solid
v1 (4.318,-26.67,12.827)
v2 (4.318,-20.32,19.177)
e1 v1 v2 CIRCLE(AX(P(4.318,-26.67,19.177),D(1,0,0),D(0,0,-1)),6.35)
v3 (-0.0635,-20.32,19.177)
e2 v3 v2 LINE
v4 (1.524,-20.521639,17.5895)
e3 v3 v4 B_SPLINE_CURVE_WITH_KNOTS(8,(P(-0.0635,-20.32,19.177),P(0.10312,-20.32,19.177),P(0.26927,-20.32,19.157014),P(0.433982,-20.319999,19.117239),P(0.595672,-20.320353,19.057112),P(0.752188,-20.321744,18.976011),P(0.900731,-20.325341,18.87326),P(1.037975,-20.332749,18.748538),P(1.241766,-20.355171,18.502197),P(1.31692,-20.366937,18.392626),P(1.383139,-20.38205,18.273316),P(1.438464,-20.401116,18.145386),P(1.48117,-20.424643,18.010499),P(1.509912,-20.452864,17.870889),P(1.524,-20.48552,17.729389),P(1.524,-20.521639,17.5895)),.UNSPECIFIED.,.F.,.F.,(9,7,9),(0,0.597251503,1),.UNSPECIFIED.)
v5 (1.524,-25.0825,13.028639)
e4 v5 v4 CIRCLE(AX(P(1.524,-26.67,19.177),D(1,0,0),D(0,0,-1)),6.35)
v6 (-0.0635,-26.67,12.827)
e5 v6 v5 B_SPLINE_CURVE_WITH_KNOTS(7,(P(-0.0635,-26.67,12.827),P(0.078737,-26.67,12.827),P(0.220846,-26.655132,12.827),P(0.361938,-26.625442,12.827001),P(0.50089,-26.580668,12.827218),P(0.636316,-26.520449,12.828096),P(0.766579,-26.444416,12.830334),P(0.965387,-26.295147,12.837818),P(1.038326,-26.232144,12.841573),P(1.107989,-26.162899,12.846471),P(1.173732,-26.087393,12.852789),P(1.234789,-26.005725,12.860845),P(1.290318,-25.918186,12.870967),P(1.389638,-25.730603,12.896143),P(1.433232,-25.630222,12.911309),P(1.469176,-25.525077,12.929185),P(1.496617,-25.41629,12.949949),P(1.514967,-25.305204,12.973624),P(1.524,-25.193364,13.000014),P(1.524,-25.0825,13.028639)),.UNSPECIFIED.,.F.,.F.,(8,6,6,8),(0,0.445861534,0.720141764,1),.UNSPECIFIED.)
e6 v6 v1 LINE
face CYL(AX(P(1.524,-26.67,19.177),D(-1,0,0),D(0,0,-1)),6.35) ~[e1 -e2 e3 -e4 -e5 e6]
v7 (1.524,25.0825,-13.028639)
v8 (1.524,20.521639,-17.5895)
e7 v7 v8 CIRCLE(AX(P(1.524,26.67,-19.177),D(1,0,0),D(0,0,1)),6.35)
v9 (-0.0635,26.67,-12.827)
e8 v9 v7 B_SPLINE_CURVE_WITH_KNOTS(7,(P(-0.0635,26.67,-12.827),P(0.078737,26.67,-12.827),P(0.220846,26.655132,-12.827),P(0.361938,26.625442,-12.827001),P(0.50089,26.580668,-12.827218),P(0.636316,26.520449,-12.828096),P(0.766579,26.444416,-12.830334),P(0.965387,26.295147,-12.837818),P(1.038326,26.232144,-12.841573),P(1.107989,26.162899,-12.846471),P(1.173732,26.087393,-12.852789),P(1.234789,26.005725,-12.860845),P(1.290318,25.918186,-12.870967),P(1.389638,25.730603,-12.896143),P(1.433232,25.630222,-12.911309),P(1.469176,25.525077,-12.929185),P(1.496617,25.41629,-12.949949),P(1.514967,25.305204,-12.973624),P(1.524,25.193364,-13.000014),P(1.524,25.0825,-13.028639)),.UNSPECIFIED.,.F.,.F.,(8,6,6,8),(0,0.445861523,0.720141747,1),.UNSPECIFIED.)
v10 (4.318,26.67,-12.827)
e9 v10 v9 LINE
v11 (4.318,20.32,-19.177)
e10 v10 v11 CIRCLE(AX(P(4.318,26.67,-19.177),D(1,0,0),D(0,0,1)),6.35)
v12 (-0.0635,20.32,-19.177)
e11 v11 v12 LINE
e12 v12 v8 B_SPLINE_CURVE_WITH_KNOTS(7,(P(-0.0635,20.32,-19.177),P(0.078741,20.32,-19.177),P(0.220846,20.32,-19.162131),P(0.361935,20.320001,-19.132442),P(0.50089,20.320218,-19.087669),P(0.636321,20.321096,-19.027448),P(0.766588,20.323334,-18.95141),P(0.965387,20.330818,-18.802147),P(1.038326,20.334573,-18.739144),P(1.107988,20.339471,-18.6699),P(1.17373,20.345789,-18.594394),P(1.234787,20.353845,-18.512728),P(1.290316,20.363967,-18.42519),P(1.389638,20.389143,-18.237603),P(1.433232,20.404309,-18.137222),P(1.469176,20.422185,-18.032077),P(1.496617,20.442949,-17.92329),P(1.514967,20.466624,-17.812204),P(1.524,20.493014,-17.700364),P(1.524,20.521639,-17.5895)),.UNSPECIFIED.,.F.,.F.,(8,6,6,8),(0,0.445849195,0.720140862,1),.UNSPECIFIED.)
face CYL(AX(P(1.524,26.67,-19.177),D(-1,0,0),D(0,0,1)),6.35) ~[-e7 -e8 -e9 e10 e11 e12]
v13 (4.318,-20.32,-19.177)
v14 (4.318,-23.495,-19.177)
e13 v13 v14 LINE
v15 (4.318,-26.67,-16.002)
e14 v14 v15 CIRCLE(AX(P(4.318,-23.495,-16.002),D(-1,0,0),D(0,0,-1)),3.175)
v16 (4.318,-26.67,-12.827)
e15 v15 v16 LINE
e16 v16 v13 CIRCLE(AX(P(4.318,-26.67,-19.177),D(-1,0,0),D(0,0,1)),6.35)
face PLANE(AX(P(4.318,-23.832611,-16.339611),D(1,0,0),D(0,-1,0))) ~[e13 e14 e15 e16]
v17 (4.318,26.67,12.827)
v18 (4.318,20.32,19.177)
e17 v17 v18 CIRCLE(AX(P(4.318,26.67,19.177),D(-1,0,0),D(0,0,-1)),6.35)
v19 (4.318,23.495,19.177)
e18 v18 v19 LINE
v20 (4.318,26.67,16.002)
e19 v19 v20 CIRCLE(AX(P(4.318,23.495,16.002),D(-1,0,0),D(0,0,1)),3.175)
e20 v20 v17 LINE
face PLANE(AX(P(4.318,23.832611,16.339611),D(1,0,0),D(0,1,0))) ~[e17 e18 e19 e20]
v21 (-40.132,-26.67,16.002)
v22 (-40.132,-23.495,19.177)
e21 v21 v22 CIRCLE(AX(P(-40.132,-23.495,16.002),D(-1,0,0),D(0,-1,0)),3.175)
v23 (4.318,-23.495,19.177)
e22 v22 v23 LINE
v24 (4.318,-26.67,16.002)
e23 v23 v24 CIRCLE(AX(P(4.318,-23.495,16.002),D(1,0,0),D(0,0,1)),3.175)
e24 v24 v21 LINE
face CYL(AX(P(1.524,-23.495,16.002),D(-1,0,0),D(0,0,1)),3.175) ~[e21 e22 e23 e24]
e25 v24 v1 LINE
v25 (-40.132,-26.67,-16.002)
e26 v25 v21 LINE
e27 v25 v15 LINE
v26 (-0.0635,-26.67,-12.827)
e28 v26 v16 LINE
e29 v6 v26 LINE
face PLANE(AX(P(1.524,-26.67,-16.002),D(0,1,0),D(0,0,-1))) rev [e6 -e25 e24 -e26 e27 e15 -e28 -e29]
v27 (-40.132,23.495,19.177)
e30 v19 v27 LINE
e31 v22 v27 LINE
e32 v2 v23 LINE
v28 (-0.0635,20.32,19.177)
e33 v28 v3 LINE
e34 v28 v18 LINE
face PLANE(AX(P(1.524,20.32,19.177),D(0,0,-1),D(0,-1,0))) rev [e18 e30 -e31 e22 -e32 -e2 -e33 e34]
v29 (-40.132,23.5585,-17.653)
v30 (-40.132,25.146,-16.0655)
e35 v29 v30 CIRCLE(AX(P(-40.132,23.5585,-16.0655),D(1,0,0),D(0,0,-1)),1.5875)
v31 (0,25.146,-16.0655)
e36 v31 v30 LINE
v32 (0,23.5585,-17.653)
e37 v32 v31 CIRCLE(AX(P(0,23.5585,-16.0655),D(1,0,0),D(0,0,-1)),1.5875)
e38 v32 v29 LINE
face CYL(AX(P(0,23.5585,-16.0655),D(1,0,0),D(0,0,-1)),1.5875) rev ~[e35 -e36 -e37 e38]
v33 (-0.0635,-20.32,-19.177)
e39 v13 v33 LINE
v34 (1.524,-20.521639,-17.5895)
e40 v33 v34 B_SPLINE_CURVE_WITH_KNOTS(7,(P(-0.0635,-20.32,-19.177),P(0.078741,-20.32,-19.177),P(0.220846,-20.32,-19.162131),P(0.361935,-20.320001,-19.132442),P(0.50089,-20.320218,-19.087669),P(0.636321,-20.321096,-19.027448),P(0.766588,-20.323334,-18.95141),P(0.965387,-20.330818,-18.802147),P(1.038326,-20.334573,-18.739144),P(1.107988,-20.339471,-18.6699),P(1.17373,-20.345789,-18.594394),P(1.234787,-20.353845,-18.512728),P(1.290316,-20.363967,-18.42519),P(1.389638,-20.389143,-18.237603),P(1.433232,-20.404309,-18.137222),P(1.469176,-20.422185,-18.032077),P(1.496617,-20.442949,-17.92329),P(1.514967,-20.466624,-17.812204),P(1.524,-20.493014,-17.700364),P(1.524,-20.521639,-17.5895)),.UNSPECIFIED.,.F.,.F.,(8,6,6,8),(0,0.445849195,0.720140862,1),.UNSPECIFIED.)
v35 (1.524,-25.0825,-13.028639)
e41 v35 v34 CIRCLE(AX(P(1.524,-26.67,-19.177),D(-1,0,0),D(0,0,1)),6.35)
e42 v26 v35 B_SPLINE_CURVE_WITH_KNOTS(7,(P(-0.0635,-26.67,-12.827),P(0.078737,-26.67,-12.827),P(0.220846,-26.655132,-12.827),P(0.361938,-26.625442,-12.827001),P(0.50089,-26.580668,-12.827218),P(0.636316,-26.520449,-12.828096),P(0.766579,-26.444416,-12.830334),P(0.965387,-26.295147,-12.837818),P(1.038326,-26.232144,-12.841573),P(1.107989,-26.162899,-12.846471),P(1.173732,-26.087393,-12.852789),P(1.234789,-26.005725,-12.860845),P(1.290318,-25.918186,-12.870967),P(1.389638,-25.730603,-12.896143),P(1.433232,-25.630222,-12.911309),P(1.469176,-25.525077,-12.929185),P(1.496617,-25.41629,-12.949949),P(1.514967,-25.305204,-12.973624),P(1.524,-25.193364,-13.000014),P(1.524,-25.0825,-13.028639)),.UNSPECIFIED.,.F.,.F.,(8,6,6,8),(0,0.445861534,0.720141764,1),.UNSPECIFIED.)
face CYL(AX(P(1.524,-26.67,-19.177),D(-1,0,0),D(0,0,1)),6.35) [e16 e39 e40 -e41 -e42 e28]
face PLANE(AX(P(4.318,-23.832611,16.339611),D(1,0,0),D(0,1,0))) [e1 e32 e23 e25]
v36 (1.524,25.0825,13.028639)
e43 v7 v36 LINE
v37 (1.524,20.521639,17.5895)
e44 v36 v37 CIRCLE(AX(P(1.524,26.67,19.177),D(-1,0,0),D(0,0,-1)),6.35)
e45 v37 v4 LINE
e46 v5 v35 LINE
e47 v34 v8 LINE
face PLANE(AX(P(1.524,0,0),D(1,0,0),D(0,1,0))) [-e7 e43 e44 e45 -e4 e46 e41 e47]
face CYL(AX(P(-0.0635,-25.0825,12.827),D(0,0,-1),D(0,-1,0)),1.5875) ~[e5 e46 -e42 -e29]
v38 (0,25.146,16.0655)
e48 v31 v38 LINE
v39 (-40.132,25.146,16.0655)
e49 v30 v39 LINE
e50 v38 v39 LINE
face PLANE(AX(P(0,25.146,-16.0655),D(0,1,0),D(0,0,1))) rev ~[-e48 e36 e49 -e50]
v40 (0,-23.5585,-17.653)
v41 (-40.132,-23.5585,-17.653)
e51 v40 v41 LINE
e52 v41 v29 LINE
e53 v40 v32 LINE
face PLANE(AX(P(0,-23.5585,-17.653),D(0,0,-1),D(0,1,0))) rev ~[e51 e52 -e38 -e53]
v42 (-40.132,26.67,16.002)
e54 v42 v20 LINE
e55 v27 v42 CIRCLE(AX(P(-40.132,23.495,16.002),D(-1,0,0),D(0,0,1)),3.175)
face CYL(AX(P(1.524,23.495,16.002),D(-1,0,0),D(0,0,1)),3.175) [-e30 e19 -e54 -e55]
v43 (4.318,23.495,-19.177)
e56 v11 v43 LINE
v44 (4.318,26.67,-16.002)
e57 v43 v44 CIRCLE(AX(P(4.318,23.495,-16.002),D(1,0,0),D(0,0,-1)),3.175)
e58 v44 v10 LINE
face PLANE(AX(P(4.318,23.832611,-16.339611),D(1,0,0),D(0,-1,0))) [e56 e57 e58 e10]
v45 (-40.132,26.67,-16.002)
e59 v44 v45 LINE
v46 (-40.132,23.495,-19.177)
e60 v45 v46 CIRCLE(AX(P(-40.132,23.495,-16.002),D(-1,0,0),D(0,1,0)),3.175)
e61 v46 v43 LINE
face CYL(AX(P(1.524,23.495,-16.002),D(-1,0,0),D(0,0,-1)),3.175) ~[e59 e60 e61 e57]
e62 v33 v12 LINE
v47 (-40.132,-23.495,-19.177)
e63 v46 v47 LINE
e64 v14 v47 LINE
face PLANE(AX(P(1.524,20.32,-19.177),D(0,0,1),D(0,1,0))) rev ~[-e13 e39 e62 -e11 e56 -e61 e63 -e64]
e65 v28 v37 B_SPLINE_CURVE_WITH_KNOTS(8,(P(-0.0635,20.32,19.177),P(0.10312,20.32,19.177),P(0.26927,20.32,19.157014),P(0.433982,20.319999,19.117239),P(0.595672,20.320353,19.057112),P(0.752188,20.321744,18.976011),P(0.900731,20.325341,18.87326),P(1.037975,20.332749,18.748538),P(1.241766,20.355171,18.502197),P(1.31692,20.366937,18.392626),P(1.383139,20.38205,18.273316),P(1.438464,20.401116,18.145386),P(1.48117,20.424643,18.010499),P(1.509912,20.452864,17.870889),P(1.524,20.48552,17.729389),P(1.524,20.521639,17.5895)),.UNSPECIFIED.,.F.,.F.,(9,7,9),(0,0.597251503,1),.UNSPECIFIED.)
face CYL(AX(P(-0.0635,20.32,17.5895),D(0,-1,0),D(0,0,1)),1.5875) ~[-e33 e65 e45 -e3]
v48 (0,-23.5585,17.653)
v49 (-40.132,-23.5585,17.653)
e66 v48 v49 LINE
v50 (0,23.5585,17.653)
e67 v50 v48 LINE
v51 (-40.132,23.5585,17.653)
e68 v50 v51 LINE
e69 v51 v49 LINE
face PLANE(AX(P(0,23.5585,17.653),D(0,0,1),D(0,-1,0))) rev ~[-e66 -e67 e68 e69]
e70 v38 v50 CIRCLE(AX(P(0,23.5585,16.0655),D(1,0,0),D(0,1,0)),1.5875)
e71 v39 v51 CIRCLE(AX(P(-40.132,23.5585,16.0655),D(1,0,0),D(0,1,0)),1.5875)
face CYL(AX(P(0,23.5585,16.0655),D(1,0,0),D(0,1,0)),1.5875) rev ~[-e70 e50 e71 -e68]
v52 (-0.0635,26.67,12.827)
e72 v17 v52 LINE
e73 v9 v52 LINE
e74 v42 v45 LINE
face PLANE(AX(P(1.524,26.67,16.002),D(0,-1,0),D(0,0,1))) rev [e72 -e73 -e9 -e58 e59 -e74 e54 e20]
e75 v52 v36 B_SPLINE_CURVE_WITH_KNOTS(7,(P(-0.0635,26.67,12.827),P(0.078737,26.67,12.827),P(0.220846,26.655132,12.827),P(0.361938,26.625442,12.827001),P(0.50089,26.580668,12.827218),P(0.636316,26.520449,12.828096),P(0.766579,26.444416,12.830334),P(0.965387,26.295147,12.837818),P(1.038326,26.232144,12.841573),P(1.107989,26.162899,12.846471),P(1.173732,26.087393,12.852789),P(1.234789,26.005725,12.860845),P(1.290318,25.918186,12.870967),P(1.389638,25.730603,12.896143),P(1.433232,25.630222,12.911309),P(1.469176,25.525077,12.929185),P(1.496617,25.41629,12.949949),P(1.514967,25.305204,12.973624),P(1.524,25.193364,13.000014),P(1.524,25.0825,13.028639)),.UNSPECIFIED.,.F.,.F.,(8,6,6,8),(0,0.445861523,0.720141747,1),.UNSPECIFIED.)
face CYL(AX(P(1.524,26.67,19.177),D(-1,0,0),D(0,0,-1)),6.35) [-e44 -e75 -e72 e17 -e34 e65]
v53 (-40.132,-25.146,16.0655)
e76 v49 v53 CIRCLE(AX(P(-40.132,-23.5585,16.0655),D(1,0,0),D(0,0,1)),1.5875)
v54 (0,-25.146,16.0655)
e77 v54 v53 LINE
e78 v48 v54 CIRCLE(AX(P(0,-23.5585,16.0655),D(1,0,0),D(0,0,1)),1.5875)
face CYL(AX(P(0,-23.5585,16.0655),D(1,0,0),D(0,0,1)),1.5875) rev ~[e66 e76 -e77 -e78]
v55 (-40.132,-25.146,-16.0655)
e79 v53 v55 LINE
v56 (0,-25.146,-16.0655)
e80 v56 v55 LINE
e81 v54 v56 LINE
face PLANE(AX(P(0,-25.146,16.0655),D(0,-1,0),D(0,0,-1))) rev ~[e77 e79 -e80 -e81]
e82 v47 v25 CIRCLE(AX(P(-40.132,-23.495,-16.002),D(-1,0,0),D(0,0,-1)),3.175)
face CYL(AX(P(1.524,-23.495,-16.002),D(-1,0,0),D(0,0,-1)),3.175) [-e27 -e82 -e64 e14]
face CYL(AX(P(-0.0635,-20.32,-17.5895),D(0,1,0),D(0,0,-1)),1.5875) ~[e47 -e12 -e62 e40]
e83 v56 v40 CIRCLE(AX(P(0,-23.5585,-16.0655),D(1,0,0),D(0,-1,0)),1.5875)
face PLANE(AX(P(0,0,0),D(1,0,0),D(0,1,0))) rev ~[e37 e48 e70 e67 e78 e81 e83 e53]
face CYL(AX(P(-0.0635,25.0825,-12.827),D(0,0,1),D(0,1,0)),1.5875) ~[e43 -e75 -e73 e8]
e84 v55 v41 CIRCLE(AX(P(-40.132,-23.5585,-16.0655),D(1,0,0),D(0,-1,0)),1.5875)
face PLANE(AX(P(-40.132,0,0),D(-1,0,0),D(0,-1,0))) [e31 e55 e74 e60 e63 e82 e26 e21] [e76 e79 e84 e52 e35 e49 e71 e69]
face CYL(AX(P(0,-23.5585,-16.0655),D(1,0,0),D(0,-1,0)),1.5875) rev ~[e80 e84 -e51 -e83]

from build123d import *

# Parameters (mm, degrees)
F1_DEPTH = 1.524
F3_DEPTH = 40.132
F5_DEPTH = 2.794
F8_R     = 1.5875
F9_R     = 1.5875
F10_R    = 1.5875
F11_R    = 1.5875


with BuildPart() as f1:
    # F0 (on Right) → F1 (new body)
    with BuildSketch(Plane.YZ):
        with BuildLine():
            ThreePointArc((26.67, 16.002), (25.7400640303, 18.2470640303), (23.495, 19.177))
            Line((23.495, 19.177), (-23.495, 19.177))
            ThreePointArc((-23.495, 19.177), (-25.7400640303, 18.2470640303), (-26.67, 16.002))
            Line((-26.67, 16.002), (-26.67, -16.002))
            ThreePointArc((-26.67, -16.002), (-25.7400640303, -18.2470640303), (-23.495, -19.177))
            Line((-23.495, -19.177), (23.495, -19.177))
            ThreePointArc((23.495, -19.177), (25.7400640303, -18.2470640303), (26.67, -16.002))
            Line((26.67, -16.002), (26.67, 16.002))
        make_face()
    extrude(amount=F1_DEPTH)

    # F2 (on face) → F3 (join)
    with BuildSketch(Plane(origin=(0, 0, 0), x_dir=(0, -1, 0), z_dir=(-1, 0, 0))):
        with BuildLine():
            ThreePointArc((-23.495, 19.177), (-25.7400640303, 18.2470640303), (-26.67, 16.002))
            Line((-26.67, 16.002), (-26.67, -16.002))
            ThreePointArc((-26.67, -16.002), (-25.7400640303, -18.2470640303), (-23.495, -19.177))
            Line((-23.495, -19.177), (23.495, -19.177))
            ThreePointArc((23.495, -19.177), (25.7400640303, -18.2470640303), (26.67, -16.002))
            Line((26.67, -16.002), (26.67, 16.002))
            ThreePointArc((26.67, 16.002), (25.7400640303, 18.2470640303), (23.495, 19.177))
            Line((23.495, 19.177), (-23.495, 19.177))
        make_face()
        with BuildLine():
            ThreePointArc((25.146, -16.0655), (24.6810320151, -17.1880320151), (23.5585, -17.653))
            Line((23.5585, -17.653), (-23.5585, -17.653))
            ThreePointArc((-23.5585, -17.653), (-24.6810320151, -17.1880320151), (-25.146, -16.0655))
            Line((-25.146, -16.0655), (-25.146, 16.0655))
            ThreePointArc((-25.146, 16.0655), (-24.6810320151, 17.1880320151), (-23.5585, 17.653))
            Line((-23.5585, 17.653), (23.5585, 17.653))
            ThreePointArc((23.5585, 17.653), (24.6810320151, 17.1880320151), (25.146, 16.0655))
            Line((25.146, 16.0655), (25.146, -16.0655))
        make_face(mode=Mode.SUBTRACT)
    extrude(amount=F3_DEPTH)

    # F4 (on face) → F5 (join)
    with BuildSketch(Plane.YZ.offset(1.524)):
        with BuildLine():
            ThreePointArc((-26.67, 12.827), (-22.1798719395, 14.6868719395), (-20.32, 19.177))
            Line((-20.32, 19.177), (-23.495, 19.177))
            ThreePointArc((-23.495, 19.177), (-25.7400640303, 18.2470640303), (-26.67, 16.002))
            Line((-26.67, 16.002), (-26.67, 12.827))
        make_face()
    extrude(amount=F5_DEPTH)


with BuildPart() as f6_1:
    # F6: instance of F1
    add(f1.part.mirror(Plane.XY))


with BuildPart() as f1_1:
    add(f1.part)

    add(f6_1.part)  # F7 merges F6_1
    # F7: F6_1, F1 across plane
    add(f6_1.part.mirror(Plane.XZ))
    add(f1.part.mirror(Plane.XZ))

    # F8
    f8_edges = [f1_1.edges().sort_by_distance(p)[0] for p in [
        (1.524, -26.67, 0),
    ]]
    fillet(f8_edges, radius=F8_R)

    # F9
    f9_edges = [f1_1.edges().sort_by_distance(p)[0] for p in [
        (1.524, 0, -19.177),
    ]]
    fillet(f9_edges, radius=F9_R)

    # F10
    f10_edges = [f1_1.edges().sort_by_distance(p)[0] for p in [
        (1.524, 26.67, 0),
    ]]
    fillet(f10_edges, radius=F10_R)

    # F11
    f11_edges = [f1_1.edges().sort_by_distance(p)[0] for p in [
        (1.524, 0, 19.177),
    ]]
    fillet(f11_edges, radius=F11_R)


solid = f1_1.part
